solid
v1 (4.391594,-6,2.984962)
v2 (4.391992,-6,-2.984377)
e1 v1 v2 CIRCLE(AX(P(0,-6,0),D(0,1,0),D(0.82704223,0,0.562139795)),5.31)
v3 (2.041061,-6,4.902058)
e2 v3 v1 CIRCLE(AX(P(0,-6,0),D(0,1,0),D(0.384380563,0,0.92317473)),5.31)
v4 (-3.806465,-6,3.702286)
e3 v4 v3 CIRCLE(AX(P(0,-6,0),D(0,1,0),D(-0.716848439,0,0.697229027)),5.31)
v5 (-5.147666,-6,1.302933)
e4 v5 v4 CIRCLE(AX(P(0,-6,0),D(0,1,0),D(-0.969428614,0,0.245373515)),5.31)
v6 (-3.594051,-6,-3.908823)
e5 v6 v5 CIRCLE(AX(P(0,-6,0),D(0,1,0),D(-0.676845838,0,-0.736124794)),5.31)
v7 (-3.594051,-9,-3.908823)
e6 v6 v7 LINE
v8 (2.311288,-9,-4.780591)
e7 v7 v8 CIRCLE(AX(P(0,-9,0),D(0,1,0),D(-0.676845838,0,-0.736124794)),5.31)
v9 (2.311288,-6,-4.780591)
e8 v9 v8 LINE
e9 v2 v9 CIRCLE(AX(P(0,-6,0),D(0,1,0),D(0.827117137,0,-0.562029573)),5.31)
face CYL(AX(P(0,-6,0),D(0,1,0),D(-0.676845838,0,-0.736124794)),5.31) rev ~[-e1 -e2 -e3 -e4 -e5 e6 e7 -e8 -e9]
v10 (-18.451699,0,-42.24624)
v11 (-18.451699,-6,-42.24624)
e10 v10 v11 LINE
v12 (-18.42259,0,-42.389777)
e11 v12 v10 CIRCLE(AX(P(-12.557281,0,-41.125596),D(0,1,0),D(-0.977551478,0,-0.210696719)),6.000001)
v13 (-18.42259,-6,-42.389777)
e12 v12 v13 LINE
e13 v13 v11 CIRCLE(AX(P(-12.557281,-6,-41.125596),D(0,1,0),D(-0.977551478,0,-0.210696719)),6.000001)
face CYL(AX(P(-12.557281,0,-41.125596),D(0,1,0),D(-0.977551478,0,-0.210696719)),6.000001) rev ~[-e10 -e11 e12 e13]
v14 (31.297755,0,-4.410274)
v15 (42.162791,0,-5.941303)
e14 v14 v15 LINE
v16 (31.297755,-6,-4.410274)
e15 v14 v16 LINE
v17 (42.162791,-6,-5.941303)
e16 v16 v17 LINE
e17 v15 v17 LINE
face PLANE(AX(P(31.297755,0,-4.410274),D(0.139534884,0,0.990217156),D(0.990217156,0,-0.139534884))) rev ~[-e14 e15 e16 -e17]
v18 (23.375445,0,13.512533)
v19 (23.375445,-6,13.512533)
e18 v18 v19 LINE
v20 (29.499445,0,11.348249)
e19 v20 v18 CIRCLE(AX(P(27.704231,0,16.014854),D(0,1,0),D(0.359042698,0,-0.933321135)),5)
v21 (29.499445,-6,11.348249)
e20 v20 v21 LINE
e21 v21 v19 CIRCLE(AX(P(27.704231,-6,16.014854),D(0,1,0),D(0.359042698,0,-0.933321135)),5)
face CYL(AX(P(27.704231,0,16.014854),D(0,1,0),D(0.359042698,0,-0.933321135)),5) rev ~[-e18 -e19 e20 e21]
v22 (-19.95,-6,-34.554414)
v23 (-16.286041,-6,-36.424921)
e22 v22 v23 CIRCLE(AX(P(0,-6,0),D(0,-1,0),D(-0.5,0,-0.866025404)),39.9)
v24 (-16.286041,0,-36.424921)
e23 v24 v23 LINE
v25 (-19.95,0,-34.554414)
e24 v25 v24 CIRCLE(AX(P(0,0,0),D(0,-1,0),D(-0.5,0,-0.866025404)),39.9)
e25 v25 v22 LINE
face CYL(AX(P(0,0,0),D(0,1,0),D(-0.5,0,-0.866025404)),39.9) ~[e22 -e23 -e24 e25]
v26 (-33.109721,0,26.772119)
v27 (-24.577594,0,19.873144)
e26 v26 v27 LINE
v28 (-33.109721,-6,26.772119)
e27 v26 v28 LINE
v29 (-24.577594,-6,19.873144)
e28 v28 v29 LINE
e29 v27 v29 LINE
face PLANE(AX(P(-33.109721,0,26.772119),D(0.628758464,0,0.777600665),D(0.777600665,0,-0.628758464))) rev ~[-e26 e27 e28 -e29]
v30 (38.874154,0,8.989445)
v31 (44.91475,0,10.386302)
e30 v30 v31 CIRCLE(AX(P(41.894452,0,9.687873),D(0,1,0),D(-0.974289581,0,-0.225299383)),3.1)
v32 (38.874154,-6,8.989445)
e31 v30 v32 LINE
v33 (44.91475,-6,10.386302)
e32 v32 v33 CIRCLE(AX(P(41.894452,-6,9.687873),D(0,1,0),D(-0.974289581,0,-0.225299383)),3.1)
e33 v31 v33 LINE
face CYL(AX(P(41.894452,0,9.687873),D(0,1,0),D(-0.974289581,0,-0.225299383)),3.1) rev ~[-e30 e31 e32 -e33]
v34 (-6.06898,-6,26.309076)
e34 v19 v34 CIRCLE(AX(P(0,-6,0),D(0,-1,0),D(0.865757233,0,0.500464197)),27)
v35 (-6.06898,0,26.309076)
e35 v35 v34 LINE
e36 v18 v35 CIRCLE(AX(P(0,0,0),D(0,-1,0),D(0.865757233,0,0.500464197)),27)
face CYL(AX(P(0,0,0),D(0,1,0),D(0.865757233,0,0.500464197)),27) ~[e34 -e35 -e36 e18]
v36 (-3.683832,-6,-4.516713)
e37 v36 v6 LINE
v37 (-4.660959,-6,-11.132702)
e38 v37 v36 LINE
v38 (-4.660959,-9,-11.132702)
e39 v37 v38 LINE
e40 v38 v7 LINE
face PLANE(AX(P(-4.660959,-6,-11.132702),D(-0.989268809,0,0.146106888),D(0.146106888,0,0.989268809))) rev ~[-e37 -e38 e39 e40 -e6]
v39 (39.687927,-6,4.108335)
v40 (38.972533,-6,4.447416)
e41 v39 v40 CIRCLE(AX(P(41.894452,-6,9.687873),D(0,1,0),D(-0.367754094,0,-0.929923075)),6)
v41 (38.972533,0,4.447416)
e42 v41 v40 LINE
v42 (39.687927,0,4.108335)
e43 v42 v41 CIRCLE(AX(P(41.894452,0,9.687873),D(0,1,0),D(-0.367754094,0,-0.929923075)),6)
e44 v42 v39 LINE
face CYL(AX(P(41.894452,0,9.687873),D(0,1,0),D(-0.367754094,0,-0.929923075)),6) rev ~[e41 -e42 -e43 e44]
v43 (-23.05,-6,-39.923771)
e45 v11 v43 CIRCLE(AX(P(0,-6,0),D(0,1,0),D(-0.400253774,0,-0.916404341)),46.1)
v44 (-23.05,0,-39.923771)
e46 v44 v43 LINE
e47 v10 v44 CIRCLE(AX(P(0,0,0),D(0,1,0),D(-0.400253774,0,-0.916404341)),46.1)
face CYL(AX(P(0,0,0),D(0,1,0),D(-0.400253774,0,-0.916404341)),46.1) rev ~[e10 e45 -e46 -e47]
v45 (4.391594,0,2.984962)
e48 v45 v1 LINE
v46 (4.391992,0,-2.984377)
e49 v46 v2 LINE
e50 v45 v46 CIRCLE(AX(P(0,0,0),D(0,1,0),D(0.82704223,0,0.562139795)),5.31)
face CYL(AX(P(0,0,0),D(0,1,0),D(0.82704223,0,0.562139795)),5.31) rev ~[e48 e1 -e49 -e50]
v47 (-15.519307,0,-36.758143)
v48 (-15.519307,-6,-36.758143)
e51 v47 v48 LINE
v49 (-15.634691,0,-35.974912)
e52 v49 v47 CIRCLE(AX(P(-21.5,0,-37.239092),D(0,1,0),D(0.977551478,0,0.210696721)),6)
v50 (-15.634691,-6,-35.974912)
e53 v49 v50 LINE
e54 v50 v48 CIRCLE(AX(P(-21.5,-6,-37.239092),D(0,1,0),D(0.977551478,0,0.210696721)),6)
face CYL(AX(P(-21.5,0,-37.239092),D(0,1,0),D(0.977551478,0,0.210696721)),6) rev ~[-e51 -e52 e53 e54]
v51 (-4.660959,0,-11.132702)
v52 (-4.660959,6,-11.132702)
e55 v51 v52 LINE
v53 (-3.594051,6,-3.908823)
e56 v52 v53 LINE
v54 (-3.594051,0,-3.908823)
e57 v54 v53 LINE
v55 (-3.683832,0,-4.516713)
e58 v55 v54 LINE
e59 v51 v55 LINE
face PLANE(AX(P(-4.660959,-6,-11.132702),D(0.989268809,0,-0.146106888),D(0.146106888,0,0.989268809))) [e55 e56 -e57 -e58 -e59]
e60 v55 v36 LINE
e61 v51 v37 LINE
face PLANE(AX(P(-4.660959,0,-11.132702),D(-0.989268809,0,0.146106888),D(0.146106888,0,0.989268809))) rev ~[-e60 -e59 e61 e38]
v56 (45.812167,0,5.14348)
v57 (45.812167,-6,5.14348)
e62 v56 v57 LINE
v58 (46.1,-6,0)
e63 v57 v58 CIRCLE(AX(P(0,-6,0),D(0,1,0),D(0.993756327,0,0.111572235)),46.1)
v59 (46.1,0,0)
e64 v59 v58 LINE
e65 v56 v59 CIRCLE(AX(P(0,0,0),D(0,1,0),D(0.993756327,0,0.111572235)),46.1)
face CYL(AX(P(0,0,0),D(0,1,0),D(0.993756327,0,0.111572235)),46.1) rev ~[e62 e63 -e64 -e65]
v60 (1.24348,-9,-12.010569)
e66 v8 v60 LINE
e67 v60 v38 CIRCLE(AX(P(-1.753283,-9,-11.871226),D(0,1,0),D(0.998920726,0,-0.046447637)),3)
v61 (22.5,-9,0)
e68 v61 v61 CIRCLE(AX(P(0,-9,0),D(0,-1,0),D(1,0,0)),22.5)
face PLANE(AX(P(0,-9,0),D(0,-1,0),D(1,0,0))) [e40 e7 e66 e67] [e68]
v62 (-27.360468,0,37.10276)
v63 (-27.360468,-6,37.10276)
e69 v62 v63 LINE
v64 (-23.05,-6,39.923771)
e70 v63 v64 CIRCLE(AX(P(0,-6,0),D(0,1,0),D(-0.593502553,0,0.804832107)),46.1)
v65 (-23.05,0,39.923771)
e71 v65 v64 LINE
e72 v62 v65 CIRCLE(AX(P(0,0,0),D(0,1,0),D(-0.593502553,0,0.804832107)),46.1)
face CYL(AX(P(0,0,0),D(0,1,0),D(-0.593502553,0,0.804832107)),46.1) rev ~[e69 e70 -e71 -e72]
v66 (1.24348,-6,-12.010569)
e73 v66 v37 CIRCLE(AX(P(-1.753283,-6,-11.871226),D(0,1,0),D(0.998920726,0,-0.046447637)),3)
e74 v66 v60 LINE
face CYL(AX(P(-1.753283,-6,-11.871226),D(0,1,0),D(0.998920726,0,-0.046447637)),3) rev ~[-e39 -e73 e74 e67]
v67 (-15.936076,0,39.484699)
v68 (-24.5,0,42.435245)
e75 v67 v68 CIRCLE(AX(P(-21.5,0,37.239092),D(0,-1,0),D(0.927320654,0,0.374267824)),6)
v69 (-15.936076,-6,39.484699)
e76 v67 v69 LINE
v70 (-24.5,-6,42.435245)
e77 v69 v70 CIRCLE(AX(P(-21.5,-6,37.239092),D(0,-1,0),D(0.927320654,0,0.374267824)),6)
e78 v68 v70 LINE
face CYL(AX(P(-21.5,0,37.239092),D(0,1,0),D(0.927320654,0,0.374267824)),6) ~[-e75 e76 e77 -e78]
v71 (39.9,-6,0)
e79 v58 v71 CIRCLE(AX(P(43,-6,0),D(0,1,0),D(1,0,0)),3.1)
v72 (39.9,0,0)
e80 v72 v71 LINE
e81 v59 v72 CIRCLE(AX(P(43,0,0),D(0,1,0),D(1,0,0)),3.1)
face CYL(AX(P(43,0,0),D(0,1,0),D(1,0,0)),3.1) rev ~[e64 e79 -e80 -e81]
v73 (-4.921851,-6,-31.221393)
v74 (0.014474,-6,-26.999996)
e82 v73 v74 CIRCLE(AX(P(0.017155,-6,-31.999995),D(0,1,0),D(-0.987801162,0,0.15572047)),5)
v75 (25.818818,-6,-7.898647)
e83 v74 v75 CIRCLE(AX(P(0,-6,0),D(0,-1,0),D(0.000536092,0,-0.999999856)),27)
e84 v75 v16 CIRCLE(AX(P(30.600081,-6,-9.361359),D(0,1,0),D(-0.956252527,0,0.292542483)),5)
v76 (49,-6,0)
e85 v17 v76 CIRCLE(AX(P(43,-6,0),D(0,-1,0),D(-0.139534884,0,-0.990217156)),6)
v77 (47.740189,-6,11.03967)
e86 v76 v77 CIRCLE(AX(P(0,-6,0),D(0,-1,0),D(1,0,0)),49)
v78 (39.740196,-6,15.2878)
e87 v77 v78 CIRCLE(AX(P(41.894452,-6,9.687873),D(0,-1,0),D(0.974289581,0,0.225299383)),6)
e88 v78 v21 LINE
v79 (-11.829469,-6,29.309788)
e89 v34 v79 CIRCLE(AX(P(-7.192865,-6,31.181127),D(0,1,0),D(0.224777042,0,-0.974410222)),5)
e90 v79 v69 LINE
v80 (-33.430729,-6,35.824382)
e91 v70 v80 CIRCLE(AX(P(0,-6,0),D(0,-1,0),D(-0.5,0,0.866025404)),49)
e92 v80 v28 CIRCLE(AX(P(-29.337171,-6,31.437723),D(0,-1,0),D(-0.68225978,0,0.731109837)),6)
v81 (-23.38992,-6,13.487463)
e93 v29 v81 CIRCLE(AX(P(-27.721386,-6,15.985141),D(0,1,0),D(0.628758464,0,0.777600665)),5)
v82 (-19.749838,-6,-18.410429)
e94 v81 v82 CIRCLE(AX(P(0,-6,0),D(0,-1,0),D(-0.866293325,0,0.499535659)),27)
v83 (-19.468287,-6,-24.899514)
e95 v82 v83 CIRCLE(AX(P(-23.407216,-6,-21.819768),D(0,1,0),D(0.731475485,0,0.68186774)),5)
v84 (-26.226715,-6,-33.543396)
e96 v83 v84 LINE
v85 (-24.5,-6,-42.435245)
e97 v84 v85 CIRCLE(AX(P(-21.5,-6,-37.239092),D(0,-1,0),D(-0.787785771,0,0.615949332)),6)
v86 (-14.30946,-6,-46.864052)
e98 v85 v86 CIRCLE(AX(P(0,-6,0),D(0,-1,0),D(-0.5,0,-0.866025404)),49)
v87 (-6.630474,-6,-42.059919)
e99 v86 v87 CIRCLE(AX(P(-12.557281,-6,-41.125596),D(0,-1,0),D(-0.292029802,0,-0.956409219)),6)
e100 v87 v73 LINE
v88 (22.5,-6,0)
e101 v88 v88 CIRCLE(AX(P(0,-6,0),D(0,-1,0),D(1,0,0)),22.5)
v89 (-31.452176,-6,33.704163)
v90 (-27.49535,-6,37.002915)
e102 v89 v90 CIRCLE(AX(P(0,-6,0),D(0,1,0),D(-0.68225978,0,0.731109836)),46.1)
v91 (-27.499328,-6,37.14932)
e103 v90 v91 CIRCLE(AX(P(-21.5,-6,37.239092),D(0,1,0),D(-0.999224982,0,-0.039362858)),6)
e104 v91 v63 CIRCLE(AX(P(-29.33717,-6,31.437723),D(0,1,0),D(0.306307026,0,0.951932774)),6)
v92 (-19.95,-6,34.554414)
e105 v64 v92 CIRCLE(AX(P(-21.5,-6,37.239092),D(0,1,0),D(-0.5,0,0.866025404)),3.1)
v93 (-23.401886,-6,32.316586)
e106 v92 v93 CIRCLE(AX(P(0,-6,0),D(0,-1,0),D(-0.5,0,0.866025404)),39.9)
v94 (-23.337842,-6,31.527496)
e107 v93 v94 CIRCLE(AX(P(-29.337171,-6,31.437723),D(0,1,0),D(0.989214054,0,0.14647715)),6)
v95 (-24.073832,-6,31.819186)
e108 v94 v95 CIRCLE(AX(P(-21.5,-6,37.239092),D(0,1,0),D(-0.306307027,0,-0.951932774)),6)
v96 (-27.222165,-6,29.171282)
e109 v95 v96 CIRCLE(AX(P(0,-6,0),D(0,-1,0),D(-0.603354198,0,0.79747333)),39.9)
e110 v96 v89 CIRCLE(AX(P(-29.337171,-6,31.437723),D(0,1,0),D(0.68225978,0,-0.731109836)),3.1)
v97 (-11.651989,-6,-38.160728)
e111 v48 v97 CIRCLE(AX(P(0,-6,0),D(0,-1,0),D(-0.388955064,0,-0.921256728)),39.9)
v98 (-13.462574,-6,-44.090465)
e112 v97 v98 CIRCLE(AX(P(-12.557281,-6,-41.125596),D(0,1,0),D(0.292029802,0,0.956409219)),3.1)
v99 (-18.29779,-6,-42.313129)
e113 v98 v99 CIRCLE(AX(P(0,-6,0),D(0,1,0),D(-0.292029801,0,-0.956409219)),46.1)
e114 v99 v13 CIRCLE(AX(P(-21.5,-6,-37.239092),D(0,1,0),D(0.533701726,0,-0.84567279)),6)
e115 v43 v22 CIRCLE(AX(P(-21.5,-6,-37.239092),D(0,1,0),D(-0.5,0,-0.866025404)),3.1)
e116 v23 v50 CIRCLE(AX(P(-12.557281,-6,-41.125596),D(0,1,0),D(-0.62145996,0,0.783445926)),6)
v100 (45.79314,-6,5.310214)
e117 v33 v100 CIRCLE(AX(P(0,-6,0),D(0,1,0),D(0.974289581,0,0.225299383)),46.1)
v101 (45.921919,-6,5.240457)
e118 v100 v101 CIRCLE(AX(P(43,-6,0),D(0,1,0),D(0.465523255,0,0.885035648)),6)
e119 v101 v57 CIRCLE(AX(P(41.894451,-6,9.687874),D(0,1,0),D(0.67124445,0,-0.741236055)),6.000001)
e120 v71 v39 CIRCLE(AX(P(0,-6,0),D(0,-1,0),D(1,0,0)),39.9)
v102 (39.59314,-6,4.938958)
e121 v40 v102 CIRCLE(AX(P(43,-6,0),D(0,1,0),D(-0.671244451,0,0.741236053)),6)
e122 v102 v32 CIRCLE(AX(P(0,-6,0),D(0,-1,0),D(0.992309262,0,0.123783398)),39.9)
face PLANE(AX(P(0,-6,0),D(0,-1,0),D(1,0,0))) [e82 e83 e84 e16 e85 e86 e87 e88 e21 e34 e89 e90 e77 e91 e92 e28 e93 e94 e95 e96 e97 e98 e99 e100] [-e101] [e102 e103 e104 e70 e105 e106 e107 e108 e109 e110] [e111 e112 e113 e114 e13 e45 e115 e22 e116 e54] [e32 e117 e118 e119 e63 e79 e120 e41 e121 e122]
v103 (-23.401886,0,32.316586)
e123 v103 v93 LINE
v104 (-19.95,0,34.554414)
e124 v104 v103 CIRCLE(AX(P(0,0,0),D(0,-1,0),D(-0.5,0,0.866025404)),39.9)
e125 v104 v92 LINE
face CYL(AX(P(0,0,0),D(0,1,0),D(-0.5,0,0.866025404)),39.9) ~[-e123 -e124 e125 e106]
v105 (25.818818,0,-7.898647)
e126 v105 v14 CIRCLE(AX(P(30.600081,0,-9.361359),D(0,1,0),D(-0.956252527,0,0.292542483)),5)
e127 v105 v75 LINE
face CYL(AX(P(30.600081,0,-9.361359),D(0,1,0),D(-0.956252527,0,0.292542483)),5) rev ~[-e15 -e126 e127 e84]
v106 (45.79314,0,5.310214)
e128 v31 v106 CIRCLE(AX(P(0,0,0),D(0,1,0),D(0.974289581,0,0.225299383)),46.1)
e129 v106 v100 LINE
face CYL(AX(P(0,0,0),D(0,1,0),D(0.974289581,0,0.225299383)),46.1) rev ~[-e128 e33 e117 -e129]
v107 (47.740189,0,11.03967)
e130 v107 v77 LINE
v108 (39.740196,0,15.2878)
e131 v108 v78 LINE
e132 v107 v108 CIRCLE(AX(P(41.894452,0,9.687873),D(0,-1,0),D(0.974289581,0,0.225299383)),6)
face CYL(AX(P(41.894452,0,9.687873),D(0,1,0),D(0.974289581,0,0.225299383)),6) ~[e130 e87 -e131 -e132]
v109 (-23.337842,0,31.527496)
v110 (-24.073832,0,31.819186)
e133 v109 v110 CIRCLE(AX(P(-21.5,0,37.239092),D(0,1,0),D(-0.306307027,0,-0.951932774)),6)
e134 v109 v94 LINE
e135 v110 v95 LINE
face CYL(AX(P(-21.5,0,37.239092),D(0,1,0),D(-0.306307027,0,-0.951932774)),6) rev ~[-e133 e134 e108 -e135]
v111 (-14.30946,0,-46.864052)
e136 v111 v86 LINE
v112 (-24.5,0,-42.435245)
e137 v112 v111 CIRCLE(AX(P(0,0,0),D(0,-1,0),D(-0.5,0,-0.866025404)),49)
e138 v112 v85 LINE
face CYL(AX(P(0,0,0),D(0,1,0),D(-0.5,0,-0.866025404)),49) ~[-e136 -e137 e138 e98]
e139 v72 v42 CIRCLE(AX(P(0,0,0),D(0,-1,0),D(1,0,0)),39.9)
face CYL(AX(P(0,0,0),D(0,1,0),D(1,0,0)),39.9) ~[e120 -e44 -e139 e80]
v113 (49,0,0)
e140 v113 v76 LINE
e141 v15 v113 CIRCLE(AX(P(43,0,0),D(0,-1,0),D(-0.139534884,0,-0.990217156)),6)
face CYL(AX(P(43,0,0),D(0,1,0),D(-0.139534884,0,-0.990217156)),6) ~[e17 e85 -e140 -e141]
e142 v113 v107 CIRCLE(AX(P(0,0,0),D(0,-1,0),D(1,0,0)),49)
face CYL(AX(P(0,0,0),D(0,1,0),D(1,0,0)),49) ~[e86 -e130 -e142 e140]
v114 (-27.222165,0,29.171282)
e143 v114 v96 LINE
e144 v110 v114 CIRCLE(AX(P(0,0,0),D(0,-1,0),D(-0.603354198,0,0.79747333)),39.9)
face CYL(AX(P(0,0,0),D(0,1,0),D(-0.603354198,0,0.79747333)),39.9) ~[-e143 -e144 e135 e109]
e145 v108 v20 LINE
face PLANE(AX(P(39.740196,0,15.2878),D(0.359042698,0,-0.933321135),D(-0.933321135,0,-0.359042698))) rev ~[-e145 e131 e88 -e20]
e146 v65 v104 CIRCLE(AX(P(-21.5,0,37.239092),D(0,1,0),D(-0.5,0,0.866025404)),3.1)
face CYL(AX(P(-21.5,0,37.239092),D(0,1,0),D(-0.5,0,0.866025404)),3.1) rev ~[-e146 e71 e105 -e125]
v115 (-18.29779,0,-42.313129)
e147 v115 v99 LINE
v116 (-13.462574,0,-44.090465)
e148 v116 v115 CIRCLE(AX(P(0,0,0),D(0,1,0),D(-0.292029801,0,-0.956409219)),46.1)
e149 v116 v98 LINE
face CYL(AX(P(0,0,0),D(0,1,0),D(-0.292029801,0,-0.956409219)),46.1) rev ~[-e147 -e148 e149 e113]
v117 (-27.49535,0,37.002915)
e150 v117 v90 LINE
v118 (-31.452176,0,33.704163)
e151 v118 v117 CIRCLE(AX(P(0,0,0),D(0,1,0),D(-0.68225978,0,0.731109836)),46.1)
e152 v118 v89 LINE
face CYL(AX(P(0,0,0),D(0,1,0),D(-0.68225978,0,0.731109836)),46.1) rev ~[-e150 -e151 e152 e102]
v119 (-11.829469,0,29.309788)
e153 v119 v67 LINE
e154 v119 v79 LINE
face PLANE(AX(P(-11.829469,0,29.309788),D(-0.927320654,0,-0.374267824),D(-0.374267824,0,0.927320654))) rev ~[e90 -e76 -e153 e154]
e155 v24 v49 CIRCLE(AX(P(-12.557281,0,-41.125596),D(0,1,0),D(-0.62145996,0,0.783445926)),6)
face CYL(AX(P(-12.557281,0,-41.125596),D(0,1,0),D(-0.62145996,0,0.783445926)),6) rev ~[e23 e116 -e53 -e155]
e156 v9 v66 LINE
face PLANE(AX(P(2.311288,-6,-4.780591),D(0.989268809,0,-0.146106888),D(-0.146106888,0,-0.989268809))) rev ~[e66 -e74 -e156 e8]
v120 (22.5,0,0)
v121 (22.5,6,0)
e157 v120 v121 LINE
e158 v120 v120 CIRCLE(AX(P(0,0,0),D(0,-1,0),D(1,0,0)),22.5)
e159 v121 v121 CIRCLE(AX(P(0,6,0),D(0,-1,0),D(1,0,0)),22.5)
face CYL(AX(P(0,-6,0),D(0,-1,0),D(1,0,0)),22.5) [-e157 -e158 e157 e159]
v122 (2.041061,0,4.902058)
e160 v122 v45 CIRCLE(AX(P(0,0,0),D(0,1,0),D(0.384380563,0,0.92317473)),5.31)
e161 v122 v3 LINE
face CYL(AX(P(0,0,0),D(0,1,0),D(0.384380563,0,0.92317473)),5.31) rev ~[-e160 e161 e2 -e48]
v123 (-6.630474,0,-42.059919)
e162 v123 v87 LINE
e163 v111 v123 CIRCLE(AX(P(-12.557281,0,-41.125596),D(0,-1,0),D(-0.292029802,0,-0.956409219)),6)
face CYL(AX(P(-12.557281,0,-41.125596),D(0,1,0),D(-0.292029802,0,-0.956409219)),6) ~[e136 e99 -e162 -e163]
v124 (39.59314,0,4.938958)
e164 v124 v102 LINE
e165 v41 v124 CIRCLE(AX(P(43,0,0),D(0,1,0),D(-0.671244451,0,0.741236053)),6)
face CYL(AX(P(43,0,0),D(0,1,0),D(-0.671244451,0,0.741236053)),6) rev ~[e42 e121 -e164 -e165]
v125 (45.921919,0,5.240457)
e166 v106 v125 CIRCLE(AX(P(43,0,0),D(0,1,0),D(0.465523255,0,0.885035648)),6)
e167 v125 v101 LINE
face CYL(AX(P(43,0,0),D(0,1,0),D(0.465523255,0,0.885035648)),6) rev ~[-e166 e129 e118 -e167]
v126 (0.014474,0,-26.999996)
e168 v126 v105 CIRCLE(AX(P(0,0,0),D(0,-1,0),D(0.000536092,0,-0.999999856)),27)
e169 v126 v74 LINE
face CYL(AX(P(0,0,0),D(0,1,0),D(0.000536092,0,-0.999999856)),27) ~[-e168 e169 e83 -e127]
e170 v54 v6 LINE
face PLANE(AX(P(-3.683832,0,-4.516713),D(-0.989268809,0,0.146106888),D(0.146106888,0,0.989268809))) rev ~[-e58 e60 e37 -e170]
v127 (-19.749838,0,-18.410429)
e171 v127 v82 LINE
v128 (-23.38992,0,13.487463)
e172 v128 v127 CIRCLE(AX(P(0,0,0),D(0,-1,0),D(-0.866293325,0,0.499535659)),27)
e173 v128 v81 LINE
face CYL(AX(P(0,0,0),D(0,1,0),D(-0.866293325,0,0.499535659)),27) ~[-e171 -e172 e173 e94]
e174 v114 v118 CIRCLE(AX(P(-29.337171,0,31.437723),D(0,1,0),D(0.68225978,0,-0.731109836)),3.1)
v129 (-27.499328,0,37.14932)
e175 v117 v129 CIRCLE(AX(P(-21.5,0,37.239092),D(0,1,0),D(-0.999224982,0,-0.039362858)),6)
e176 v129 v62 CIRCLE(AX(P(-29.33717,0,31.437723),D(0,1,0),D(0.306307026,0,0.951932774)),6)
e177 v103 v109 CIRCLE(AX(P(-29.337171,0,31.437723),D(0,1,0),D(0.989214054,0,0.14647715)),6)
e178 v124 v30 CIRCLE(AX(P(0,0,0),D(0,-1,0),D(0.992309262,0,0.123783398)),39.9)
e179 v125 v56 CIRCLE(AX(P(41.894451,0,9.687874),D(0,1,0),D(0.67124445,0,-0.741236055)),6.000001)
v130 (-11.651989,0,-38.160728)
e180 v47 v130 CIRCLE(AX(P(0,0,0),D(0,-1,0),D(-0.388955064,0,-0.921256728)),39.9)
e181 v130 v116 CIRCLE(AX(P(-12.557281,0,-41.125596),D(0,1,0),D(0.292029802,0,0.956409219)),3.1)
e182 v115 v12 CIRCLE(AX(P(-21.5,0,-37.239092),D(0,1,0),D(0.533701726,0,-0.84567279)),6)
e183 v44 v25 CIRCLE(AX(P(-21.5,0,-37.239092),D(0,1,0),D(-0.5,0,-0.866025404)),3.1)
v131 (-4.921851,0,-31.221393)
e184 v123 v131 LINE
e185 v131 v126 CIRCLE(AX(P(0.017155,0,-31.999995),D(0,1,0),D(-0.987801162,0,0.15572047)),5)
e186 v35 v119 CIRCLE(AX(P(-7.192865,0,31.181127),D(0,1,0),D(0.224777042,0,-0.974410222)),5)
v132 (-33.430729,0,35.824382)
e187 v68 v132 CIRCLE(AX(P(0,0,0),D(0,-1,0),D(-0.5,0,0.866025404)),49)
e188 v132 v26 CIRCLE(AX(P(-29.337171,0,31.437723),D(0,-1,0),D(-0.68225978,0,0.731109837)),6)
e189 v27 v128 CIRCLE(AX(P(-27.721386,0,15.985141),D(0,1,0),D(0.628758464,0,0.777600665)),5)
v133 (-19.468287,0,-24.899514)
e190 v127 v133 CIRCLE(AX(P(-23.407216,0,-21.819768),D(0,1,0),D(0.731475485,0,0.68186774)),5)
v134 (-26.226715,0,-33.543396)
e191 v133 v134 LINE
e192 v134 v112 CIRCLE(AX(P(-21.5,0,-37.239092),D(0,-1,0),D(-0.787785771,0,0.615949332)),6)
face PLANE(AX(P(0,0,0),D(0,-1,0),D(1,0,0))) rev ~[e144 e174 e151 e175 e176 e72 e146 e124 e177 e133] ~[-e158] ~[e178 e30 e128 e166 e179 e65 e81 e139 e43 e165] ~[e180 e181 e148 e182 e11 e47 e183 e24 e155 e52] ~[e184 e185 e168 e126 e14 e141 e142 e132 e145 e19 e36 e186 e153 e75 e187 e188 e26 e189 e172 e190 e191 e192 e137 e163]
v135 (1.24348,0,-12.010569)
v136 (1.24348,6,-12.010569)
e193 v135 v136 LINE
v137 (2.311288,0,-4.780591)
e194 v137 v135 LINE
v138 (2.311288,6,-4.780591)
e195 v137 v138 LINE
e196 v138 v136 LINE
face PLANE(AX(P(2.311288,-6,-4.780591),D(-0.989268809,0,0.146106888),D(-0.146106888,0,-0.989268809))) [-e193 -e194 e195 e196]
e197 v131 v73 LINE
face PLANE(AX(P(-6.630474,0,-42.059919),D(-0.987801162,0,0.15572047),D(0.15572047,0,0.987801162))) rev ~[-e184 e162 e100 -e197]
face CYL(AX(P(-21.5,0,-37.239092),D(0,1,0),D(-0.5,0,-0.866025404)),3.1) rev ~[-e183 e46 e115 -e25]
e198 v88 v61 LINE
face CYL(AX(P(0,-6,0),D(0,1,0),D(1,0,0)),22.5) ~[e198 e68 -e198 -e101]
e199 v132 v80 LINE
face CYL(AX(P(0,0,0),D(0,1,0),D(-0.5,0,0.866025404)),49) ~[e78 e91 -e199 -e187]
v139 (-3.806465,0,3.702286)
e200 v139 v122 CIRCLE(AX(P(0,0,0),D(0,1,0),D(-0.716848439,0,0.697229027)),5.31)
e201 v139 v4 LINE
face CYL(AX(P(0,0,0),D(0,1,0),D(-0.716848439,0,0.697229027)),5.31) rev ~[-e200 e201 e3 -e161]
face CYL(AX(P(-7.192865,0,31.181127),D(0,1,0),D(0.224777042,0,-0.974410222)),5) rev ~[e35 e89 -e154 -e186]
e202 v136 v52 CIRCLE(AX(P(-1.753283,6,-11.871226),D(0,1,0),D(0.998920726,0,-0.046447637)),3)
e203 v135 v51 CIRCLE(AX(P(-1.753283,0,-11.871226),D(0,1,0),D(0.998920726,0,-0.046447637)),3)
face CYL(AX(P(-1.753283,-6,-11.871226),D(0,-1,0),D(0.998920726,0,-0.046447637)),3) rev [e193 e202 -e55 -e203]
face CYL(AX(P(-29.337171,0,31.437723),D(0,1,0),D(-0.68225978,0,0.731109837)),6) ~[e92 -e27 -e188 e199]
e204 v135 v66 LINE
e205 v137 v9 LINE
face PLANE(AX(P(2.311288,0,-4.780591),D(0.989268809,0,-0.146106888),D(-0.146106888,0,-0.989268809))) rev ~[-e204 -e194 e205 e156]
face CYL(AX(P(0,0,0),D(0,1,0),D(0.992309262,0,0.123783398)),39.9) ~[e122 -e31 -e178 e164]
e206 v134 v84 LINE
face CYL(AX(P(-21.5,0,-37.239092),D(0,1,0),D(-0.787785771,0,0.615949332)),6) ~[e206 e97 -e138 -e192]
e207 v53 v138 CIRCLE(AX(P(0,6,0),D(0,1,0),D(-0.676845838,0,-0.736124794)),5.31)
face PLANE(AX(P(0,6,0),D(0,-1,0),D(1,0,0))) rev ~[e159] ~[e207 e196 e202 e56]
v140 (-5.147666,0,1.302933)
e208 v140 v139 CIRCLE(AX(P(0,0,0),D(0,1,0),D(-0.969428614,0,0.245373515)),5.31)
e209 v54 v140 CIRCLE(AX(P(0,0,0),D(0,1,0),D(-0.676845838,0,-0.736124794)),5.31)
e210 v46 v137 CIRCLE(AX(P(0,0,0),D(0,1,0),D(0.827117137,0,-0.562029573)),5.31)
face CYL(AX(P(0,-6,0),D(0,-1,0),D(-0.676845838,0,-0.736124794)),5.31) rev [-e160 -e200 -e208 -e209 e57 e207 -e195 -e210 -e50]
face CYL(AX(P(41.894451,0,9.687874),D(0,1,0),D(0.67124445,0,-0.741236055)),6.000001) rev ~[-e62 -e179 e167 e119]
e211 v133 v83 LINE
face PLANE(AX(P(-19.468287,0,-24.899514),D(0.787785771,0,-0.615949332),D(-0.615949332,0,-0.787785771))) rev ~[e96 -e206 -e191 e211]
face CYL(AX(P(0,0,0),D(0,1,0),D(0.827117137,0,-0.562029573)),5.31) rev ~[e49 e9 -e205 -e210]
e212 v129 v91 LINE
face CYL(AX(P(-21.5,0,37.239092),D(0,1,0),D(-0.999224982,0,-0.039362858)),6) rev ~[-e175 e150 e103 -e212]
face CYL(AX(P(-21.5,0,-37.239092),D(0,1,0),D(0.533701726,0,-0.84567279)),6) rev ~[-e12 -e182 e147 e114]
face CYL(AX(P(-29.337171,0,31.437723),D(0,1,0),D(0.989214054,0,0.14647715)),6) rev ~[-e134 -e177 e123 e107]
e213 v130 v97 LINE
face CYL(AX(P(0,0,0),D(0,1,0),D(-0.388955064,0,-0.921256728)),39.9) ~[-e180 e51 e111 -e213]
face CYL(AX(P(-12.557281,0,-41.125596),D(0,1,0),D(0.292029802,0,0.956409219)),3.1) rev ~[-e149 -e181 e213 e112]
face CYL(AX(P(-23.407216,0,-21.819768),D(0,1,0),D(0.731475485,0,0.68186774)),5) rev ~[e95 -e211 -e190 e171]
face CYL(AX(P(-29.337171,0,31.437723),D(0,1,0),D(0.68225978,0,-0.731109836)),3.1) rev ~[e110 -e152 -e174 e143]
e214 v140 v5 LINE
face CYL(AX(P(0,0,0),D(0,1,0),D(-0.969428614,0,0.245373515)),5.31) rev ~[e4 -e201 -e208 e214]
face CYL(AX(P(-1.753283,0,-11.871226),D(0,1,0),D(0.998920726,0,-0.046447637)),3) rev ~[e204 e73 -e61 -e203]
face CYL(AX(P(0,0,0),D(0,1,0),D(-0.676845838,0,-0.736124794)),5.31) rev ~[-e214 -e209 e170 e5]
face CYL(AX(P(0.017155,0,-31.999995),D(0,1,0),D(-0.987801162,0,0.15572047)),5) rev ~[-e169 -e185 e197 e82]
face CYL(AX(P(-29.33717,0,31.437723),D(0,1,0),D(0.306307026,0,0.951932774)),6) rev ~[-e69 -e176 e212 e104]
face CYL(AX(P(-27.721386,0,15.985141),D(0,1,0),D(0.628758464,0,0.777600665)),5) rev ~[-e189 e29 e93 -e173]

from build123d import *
from build123d import SkipClean  # not in build123d's __all__

# Parameters (mm, degrees)
F1_DEPTH      = 6
F2_R          = 22.5
F3_DEPTH      = 3
F3_DEPTH_BACK = 12


with BuildPart() as f1:
    # F0 (on Front) → F1 (new body)
    with BuildSketch(Plane.XZ):
        with BuildLine():
            ThreePointArc((-15.9360760742, 39.4846993069), (-19.545554777, 42.911846885), (-24.5, 42.4352447854))
            ThreePointArc((-24.5, 42.4352447854), (-29.1533569815, 39.3837755518), (-33.430729205, 35.824381988))
            ThreePointArc((-33.430729205, 35.824381988), (-35.3334015022, 31.2250869161), (-33.1097213112, 26.7721189803))
            Line((-33.1097213112, 26.7721189803), (-24.5775940866, 19.8731444143))
            ThreePointArc((-24.5775940866, 19.8731444143), (-22.8056864044, 16.8994131973), (-23.3899197808, 13.487462795))
            ThreePointArc((-23.3899197808, 13.487462795), (-26.8258933187, -3.0612820274), (-19.7498381023, -18.410428972))
            ThreePointArc((-19.7498381023, -18.410428972), (-18.4119152904, -21.6030292813), (-19.4682866758, -24.8995143308))
            Line((-19.4682866758, -24.8995143308), (-26.2267146235, -33.5433963703))
            ThreePointArc((-26.2267146235, -33.5433963703), (-27.3899721372, -38.3828704105), (-24.5, -42.4352447854))
            ThreePointArc((-24.5, -42.4352447854), (-19.530671634, -44.9394355274), (-14.3094602739, -46.8640517526))
            ThreePointArc((-14.3094602739, -46.8640517526), (-9.3750177536, -46.212166761), (-6.6304744945, -42.0599192579))
            Line((-6.6304744945, -42.0599192579), (-4.9218508726, -31.2213930501))
            ThreePointArc((-4.9218508726, -31.2213930501), (-3.2324779357, -28.2000103756), (0.0144744773, -26.9999961202))
            ThreePointArc((0.0144744773, -26.9999961202), (16.0640946633, -21.7012640795), (25.8188182355, -7.8986470313))
            ThreePointArc((25.8188182355, -7.8986470313), (27.9147298015, -5.1436717332), (31.2977552903, -4.410273664))
            Line((31.2977552903, -4.410273664), (42.1627906977, -5.9413029366))
            ThreePointArc((42.1627906977, -5.9413029366), (46.9355269143, -4.5289764745), (49, 0))
            ThreePointArc((49, 0), (48.6840286155, 5.5556599757), (47.740189479, 11.0396697646))
            ThreePointArc((47.740189479, 11.0396697646), (44.7084192558, 14.987079845), (39.7401958057, 15.2878002776))
            Line((39.7401958057, 15.2878002776), (29.4994449592, 11.3482486357))
            ThreePointArc((29.4994449592, 11.3482486357), (26.0381643401, 11.3005971783), (23.3754453035, 13.5125333252))
            ThreePointArc((23.3754453035, 13.5125333252), (10.7617986555, 24.7625461069), (-6.0689801331, 26.3090760032))
            ThreePointArc((-6.0689801331, 26.3090760032), (-9.5028145111, 26.7467010144), (-11.8294686145, 29.3097879948))
            Line((-11.8294686145, 29.3097879948), (-15.9360760742, 39.4846993069))
        make_face()
        with BuildLine():
            ThreePointArc((-18.2977896407, -42.3131291004), (-18.3599561093, -42.3518337374), (-18.4225903326, -42.3897767579))
            ThreePointArc((-18.4225903326, -42.3897767579), (-18.4375826284, -42.3180972643), (-18.4516989687, -42.2462401305))
            ThreePointArc((-18.4516989687, -42.2462401305), (-20.7833159026, -41.1492865077), (-23.05, -39.9237711145))
            ThreePointArc((-23.05, -39.9237711145), (-24.1846787517, -35.6890923627), (-19.95, -34.554413611))
            ThreePointArc((-19.95, -34.554413611), (-18.1421434856, -35.5369192496), (-16.2860412235, -36.4249208821))
            ThreePointArc((-16.2860412235, -36.4249208821), (-15.9677964631, -36.1891617461), (-15.6346911323, -35.9749120408))
            ThreePointArc((-15.6346911323, -35.9749120408), (-15.5640668297, -36.3646225815), (-15.519307053, -36.7581434324))
            ThreePointArc((-15.519307053, -36.7581434324), (-13.6037364042, -37.5093102555), (-11.6519890802, -38.1607278557))
            ThreePointArc((-11.6519890802, -38.1607278557), (-9.5924128846, -42.0308888206), (-13.4625738495, -44.0904650162))
            ThreePointArc((-13.4625738495, -44.0904650162), (-15.9050276013, -43.2693898386), (-18.2977896407, -42.3131291004))
        make_face(mode=Mode.SUBTRACT)
        with BuildLine():
            ThreePointArc((2.0410607887, 4.9020578186), (3.3561252192, 4.1149147638), (4.3915942436, 2.9849623113))
            ThreePointArc((4.3915942436, 2.9849623113), (5.3099999882, 0.0003538209), (4.3919919982, -2.9843770351))
            ThreePointArc((4.3919919982, -2.9843770351), (3.4698827698, -4.0194543864), (2.3112879445, -4.7805907624))
            Line((2.3112879445, -4.7805907624), (1.2434795246, -12.010568624))
            ThreePointArc((1.2434795246, -12.010568624), (-2.1944705259, -14.838607263), (-4.6609590448, -11.1327015059))
            Line((-4.6609590448, -11.1327015059), (-3.6838317901, -4.5167128251))
            Line((-3.6838317901, -4.5167128251), (-3.5940513986, -3.9088226545))
            ThreePointArc((-3.5940513986, -3.9088226545), (-5.0887135619, -1.5169358209), (-5.1476659417, 1.3029333647))
            ThreePointArc((-5.1476659417, 1.3029333647), (-4.6350123617, 2.5908995362), (-3.8064652091, 3.7022861332))
            ThreePointArc((-3.8064652091, 3.7022861332), (-1.0672517117, 5.2016414509), (2.0410607887, 4.9020578186))
        make_face(mode=Mode.SUBTRACT)
        with BuildLine():
            ThreePointArc((-23.05, 39.9237711145), (-18.8153212483, 38.7890923627), (-19.95, 34.554413611))
            ThreePointArc((-19.95, 34.554413611), (-21.7048030996, 33.4800167624), (-23.401886203, 32.3165858677))
            ThreePointArc((-23.401886203, 32.3165858677), (-23.3568351823, 31.9230982526), (-23.3378421601, 31.5274957213))
            ThreePointArc((-23.3378421601, 31.5274957213), (-23.7106535397, 31.6611885515), (-24.0738324819, 31.8191858732))
            ThreePointArc((-24.0738324819, 31.8191858732), (-25.6821473576, 30.5358364402), (-27.2221652098, 29.1712824759))
            ThreePointArc((-27.2221652098, 29.1712824759), (-31.60361102, 29.322717652), (-31.4521758439, 33.7041634621))
            ThreePointArc((-31.4521758439, 33.7041634621), (-29.5198770058, 35.4088528699), (-27.4953498942, 37.0029152121))
            ThreePointArc((-27.4953498942, 37.0029152121), (-27.4977858588, 37.0761052717), (-27.4993283668, 37.1493196105))
            ThreePointArc((-27.4993283668, 37.1493196105), (-27.4297559565, 37.1264635728), (-27.3604676831, 37.1027601152))
            ThreePointArc((-27.3604676831, 37.1027601152), (-25.244669512, 38.5735228004), (-23.05, 39.9237711145))
        make_face(mode=Mode.SUBTRACT)
        with BuildLine():
            ThreePointArc((45.7931395349, 5.3102138882), (45.8577419681, 5.2757284657), (45.9219186994, 5.2404571474))
            ThreePointArc((45.9219186994, 5.2404571474), (45.8673385849, 5.1916336916), (45.8121666518, 5.1434800154))
            ThreePointArc((45.8121666518, 5.1434800154), (46.0279854146, 2.5757637074), (46.1, 0))
            ThreePointArc((46.1, 0), (43, -3.1), (39.9, 0))
            ThreePointArc((39.9, 0), (39.8469465851, 2.0569024872), (39.6879274265, 4.1083350144))
            ThreePointArc((39.6879274265, 4.1083350144), (39.3246316454, 4.2660634935), (38.9725332924, 4.4474163195))
            ThreePointArc((38.9725332924, 4.4474163195), (39.2747203695, 4.70343403), (39.5931395349, 4.9389575592))
            ThreePointArc((39.5931395349, 4.9389575592), (39.2858837618, 6.9734738153), (38.87415429, 8.9894453798))
            ThreePointArc((38.87415429, 8.9894453798), (41.1960239046, 12.7081711687), (44.9147496935, 10.3863015541))
            ThreePointArc((44.9147496935, 10.3863015541), (45.4249046071, 7.8605369687), (45.7931395349, 5.3102138882))
        make_face(mode=Mode.SUBTRACT)
    extrude(amount=F1_DEPTH)

    # F2 (on face) → F3 (join, two sides)
    with BuildSketch(Plane.XZ.offset(6)) as f3_sk:
        Circle(F2_R)
        with BuildLine():
            Line((-4.6609590448, -11.1327015059), (-3.5940513986, -3.9088226545))
            ThreePointArc((-3.5940513986, -3.9088226545), (0.7754775485, 5.2530690621), (2.3112879445, -4.7805907624))
            Line((2.3112879445, -4.7805907624), (1.2434795246, -12.010568624))
            ThreePointArc((1.2434795246, -12.010568624), (-2.1944705259, -14.838607263), (-4.6609590448, -11.1327015059))
        make_face(mode=Mode.SUBTRACT)
    with SkipClean():  # cleaning this boolean's faces spoils the solid; the shape is the same uncleaned
        extrude(amount=F3_DEPTH)
        extrude(f3_sk.sketch, amount=-F3_DEPTH_BACK)


solid = f1.part
